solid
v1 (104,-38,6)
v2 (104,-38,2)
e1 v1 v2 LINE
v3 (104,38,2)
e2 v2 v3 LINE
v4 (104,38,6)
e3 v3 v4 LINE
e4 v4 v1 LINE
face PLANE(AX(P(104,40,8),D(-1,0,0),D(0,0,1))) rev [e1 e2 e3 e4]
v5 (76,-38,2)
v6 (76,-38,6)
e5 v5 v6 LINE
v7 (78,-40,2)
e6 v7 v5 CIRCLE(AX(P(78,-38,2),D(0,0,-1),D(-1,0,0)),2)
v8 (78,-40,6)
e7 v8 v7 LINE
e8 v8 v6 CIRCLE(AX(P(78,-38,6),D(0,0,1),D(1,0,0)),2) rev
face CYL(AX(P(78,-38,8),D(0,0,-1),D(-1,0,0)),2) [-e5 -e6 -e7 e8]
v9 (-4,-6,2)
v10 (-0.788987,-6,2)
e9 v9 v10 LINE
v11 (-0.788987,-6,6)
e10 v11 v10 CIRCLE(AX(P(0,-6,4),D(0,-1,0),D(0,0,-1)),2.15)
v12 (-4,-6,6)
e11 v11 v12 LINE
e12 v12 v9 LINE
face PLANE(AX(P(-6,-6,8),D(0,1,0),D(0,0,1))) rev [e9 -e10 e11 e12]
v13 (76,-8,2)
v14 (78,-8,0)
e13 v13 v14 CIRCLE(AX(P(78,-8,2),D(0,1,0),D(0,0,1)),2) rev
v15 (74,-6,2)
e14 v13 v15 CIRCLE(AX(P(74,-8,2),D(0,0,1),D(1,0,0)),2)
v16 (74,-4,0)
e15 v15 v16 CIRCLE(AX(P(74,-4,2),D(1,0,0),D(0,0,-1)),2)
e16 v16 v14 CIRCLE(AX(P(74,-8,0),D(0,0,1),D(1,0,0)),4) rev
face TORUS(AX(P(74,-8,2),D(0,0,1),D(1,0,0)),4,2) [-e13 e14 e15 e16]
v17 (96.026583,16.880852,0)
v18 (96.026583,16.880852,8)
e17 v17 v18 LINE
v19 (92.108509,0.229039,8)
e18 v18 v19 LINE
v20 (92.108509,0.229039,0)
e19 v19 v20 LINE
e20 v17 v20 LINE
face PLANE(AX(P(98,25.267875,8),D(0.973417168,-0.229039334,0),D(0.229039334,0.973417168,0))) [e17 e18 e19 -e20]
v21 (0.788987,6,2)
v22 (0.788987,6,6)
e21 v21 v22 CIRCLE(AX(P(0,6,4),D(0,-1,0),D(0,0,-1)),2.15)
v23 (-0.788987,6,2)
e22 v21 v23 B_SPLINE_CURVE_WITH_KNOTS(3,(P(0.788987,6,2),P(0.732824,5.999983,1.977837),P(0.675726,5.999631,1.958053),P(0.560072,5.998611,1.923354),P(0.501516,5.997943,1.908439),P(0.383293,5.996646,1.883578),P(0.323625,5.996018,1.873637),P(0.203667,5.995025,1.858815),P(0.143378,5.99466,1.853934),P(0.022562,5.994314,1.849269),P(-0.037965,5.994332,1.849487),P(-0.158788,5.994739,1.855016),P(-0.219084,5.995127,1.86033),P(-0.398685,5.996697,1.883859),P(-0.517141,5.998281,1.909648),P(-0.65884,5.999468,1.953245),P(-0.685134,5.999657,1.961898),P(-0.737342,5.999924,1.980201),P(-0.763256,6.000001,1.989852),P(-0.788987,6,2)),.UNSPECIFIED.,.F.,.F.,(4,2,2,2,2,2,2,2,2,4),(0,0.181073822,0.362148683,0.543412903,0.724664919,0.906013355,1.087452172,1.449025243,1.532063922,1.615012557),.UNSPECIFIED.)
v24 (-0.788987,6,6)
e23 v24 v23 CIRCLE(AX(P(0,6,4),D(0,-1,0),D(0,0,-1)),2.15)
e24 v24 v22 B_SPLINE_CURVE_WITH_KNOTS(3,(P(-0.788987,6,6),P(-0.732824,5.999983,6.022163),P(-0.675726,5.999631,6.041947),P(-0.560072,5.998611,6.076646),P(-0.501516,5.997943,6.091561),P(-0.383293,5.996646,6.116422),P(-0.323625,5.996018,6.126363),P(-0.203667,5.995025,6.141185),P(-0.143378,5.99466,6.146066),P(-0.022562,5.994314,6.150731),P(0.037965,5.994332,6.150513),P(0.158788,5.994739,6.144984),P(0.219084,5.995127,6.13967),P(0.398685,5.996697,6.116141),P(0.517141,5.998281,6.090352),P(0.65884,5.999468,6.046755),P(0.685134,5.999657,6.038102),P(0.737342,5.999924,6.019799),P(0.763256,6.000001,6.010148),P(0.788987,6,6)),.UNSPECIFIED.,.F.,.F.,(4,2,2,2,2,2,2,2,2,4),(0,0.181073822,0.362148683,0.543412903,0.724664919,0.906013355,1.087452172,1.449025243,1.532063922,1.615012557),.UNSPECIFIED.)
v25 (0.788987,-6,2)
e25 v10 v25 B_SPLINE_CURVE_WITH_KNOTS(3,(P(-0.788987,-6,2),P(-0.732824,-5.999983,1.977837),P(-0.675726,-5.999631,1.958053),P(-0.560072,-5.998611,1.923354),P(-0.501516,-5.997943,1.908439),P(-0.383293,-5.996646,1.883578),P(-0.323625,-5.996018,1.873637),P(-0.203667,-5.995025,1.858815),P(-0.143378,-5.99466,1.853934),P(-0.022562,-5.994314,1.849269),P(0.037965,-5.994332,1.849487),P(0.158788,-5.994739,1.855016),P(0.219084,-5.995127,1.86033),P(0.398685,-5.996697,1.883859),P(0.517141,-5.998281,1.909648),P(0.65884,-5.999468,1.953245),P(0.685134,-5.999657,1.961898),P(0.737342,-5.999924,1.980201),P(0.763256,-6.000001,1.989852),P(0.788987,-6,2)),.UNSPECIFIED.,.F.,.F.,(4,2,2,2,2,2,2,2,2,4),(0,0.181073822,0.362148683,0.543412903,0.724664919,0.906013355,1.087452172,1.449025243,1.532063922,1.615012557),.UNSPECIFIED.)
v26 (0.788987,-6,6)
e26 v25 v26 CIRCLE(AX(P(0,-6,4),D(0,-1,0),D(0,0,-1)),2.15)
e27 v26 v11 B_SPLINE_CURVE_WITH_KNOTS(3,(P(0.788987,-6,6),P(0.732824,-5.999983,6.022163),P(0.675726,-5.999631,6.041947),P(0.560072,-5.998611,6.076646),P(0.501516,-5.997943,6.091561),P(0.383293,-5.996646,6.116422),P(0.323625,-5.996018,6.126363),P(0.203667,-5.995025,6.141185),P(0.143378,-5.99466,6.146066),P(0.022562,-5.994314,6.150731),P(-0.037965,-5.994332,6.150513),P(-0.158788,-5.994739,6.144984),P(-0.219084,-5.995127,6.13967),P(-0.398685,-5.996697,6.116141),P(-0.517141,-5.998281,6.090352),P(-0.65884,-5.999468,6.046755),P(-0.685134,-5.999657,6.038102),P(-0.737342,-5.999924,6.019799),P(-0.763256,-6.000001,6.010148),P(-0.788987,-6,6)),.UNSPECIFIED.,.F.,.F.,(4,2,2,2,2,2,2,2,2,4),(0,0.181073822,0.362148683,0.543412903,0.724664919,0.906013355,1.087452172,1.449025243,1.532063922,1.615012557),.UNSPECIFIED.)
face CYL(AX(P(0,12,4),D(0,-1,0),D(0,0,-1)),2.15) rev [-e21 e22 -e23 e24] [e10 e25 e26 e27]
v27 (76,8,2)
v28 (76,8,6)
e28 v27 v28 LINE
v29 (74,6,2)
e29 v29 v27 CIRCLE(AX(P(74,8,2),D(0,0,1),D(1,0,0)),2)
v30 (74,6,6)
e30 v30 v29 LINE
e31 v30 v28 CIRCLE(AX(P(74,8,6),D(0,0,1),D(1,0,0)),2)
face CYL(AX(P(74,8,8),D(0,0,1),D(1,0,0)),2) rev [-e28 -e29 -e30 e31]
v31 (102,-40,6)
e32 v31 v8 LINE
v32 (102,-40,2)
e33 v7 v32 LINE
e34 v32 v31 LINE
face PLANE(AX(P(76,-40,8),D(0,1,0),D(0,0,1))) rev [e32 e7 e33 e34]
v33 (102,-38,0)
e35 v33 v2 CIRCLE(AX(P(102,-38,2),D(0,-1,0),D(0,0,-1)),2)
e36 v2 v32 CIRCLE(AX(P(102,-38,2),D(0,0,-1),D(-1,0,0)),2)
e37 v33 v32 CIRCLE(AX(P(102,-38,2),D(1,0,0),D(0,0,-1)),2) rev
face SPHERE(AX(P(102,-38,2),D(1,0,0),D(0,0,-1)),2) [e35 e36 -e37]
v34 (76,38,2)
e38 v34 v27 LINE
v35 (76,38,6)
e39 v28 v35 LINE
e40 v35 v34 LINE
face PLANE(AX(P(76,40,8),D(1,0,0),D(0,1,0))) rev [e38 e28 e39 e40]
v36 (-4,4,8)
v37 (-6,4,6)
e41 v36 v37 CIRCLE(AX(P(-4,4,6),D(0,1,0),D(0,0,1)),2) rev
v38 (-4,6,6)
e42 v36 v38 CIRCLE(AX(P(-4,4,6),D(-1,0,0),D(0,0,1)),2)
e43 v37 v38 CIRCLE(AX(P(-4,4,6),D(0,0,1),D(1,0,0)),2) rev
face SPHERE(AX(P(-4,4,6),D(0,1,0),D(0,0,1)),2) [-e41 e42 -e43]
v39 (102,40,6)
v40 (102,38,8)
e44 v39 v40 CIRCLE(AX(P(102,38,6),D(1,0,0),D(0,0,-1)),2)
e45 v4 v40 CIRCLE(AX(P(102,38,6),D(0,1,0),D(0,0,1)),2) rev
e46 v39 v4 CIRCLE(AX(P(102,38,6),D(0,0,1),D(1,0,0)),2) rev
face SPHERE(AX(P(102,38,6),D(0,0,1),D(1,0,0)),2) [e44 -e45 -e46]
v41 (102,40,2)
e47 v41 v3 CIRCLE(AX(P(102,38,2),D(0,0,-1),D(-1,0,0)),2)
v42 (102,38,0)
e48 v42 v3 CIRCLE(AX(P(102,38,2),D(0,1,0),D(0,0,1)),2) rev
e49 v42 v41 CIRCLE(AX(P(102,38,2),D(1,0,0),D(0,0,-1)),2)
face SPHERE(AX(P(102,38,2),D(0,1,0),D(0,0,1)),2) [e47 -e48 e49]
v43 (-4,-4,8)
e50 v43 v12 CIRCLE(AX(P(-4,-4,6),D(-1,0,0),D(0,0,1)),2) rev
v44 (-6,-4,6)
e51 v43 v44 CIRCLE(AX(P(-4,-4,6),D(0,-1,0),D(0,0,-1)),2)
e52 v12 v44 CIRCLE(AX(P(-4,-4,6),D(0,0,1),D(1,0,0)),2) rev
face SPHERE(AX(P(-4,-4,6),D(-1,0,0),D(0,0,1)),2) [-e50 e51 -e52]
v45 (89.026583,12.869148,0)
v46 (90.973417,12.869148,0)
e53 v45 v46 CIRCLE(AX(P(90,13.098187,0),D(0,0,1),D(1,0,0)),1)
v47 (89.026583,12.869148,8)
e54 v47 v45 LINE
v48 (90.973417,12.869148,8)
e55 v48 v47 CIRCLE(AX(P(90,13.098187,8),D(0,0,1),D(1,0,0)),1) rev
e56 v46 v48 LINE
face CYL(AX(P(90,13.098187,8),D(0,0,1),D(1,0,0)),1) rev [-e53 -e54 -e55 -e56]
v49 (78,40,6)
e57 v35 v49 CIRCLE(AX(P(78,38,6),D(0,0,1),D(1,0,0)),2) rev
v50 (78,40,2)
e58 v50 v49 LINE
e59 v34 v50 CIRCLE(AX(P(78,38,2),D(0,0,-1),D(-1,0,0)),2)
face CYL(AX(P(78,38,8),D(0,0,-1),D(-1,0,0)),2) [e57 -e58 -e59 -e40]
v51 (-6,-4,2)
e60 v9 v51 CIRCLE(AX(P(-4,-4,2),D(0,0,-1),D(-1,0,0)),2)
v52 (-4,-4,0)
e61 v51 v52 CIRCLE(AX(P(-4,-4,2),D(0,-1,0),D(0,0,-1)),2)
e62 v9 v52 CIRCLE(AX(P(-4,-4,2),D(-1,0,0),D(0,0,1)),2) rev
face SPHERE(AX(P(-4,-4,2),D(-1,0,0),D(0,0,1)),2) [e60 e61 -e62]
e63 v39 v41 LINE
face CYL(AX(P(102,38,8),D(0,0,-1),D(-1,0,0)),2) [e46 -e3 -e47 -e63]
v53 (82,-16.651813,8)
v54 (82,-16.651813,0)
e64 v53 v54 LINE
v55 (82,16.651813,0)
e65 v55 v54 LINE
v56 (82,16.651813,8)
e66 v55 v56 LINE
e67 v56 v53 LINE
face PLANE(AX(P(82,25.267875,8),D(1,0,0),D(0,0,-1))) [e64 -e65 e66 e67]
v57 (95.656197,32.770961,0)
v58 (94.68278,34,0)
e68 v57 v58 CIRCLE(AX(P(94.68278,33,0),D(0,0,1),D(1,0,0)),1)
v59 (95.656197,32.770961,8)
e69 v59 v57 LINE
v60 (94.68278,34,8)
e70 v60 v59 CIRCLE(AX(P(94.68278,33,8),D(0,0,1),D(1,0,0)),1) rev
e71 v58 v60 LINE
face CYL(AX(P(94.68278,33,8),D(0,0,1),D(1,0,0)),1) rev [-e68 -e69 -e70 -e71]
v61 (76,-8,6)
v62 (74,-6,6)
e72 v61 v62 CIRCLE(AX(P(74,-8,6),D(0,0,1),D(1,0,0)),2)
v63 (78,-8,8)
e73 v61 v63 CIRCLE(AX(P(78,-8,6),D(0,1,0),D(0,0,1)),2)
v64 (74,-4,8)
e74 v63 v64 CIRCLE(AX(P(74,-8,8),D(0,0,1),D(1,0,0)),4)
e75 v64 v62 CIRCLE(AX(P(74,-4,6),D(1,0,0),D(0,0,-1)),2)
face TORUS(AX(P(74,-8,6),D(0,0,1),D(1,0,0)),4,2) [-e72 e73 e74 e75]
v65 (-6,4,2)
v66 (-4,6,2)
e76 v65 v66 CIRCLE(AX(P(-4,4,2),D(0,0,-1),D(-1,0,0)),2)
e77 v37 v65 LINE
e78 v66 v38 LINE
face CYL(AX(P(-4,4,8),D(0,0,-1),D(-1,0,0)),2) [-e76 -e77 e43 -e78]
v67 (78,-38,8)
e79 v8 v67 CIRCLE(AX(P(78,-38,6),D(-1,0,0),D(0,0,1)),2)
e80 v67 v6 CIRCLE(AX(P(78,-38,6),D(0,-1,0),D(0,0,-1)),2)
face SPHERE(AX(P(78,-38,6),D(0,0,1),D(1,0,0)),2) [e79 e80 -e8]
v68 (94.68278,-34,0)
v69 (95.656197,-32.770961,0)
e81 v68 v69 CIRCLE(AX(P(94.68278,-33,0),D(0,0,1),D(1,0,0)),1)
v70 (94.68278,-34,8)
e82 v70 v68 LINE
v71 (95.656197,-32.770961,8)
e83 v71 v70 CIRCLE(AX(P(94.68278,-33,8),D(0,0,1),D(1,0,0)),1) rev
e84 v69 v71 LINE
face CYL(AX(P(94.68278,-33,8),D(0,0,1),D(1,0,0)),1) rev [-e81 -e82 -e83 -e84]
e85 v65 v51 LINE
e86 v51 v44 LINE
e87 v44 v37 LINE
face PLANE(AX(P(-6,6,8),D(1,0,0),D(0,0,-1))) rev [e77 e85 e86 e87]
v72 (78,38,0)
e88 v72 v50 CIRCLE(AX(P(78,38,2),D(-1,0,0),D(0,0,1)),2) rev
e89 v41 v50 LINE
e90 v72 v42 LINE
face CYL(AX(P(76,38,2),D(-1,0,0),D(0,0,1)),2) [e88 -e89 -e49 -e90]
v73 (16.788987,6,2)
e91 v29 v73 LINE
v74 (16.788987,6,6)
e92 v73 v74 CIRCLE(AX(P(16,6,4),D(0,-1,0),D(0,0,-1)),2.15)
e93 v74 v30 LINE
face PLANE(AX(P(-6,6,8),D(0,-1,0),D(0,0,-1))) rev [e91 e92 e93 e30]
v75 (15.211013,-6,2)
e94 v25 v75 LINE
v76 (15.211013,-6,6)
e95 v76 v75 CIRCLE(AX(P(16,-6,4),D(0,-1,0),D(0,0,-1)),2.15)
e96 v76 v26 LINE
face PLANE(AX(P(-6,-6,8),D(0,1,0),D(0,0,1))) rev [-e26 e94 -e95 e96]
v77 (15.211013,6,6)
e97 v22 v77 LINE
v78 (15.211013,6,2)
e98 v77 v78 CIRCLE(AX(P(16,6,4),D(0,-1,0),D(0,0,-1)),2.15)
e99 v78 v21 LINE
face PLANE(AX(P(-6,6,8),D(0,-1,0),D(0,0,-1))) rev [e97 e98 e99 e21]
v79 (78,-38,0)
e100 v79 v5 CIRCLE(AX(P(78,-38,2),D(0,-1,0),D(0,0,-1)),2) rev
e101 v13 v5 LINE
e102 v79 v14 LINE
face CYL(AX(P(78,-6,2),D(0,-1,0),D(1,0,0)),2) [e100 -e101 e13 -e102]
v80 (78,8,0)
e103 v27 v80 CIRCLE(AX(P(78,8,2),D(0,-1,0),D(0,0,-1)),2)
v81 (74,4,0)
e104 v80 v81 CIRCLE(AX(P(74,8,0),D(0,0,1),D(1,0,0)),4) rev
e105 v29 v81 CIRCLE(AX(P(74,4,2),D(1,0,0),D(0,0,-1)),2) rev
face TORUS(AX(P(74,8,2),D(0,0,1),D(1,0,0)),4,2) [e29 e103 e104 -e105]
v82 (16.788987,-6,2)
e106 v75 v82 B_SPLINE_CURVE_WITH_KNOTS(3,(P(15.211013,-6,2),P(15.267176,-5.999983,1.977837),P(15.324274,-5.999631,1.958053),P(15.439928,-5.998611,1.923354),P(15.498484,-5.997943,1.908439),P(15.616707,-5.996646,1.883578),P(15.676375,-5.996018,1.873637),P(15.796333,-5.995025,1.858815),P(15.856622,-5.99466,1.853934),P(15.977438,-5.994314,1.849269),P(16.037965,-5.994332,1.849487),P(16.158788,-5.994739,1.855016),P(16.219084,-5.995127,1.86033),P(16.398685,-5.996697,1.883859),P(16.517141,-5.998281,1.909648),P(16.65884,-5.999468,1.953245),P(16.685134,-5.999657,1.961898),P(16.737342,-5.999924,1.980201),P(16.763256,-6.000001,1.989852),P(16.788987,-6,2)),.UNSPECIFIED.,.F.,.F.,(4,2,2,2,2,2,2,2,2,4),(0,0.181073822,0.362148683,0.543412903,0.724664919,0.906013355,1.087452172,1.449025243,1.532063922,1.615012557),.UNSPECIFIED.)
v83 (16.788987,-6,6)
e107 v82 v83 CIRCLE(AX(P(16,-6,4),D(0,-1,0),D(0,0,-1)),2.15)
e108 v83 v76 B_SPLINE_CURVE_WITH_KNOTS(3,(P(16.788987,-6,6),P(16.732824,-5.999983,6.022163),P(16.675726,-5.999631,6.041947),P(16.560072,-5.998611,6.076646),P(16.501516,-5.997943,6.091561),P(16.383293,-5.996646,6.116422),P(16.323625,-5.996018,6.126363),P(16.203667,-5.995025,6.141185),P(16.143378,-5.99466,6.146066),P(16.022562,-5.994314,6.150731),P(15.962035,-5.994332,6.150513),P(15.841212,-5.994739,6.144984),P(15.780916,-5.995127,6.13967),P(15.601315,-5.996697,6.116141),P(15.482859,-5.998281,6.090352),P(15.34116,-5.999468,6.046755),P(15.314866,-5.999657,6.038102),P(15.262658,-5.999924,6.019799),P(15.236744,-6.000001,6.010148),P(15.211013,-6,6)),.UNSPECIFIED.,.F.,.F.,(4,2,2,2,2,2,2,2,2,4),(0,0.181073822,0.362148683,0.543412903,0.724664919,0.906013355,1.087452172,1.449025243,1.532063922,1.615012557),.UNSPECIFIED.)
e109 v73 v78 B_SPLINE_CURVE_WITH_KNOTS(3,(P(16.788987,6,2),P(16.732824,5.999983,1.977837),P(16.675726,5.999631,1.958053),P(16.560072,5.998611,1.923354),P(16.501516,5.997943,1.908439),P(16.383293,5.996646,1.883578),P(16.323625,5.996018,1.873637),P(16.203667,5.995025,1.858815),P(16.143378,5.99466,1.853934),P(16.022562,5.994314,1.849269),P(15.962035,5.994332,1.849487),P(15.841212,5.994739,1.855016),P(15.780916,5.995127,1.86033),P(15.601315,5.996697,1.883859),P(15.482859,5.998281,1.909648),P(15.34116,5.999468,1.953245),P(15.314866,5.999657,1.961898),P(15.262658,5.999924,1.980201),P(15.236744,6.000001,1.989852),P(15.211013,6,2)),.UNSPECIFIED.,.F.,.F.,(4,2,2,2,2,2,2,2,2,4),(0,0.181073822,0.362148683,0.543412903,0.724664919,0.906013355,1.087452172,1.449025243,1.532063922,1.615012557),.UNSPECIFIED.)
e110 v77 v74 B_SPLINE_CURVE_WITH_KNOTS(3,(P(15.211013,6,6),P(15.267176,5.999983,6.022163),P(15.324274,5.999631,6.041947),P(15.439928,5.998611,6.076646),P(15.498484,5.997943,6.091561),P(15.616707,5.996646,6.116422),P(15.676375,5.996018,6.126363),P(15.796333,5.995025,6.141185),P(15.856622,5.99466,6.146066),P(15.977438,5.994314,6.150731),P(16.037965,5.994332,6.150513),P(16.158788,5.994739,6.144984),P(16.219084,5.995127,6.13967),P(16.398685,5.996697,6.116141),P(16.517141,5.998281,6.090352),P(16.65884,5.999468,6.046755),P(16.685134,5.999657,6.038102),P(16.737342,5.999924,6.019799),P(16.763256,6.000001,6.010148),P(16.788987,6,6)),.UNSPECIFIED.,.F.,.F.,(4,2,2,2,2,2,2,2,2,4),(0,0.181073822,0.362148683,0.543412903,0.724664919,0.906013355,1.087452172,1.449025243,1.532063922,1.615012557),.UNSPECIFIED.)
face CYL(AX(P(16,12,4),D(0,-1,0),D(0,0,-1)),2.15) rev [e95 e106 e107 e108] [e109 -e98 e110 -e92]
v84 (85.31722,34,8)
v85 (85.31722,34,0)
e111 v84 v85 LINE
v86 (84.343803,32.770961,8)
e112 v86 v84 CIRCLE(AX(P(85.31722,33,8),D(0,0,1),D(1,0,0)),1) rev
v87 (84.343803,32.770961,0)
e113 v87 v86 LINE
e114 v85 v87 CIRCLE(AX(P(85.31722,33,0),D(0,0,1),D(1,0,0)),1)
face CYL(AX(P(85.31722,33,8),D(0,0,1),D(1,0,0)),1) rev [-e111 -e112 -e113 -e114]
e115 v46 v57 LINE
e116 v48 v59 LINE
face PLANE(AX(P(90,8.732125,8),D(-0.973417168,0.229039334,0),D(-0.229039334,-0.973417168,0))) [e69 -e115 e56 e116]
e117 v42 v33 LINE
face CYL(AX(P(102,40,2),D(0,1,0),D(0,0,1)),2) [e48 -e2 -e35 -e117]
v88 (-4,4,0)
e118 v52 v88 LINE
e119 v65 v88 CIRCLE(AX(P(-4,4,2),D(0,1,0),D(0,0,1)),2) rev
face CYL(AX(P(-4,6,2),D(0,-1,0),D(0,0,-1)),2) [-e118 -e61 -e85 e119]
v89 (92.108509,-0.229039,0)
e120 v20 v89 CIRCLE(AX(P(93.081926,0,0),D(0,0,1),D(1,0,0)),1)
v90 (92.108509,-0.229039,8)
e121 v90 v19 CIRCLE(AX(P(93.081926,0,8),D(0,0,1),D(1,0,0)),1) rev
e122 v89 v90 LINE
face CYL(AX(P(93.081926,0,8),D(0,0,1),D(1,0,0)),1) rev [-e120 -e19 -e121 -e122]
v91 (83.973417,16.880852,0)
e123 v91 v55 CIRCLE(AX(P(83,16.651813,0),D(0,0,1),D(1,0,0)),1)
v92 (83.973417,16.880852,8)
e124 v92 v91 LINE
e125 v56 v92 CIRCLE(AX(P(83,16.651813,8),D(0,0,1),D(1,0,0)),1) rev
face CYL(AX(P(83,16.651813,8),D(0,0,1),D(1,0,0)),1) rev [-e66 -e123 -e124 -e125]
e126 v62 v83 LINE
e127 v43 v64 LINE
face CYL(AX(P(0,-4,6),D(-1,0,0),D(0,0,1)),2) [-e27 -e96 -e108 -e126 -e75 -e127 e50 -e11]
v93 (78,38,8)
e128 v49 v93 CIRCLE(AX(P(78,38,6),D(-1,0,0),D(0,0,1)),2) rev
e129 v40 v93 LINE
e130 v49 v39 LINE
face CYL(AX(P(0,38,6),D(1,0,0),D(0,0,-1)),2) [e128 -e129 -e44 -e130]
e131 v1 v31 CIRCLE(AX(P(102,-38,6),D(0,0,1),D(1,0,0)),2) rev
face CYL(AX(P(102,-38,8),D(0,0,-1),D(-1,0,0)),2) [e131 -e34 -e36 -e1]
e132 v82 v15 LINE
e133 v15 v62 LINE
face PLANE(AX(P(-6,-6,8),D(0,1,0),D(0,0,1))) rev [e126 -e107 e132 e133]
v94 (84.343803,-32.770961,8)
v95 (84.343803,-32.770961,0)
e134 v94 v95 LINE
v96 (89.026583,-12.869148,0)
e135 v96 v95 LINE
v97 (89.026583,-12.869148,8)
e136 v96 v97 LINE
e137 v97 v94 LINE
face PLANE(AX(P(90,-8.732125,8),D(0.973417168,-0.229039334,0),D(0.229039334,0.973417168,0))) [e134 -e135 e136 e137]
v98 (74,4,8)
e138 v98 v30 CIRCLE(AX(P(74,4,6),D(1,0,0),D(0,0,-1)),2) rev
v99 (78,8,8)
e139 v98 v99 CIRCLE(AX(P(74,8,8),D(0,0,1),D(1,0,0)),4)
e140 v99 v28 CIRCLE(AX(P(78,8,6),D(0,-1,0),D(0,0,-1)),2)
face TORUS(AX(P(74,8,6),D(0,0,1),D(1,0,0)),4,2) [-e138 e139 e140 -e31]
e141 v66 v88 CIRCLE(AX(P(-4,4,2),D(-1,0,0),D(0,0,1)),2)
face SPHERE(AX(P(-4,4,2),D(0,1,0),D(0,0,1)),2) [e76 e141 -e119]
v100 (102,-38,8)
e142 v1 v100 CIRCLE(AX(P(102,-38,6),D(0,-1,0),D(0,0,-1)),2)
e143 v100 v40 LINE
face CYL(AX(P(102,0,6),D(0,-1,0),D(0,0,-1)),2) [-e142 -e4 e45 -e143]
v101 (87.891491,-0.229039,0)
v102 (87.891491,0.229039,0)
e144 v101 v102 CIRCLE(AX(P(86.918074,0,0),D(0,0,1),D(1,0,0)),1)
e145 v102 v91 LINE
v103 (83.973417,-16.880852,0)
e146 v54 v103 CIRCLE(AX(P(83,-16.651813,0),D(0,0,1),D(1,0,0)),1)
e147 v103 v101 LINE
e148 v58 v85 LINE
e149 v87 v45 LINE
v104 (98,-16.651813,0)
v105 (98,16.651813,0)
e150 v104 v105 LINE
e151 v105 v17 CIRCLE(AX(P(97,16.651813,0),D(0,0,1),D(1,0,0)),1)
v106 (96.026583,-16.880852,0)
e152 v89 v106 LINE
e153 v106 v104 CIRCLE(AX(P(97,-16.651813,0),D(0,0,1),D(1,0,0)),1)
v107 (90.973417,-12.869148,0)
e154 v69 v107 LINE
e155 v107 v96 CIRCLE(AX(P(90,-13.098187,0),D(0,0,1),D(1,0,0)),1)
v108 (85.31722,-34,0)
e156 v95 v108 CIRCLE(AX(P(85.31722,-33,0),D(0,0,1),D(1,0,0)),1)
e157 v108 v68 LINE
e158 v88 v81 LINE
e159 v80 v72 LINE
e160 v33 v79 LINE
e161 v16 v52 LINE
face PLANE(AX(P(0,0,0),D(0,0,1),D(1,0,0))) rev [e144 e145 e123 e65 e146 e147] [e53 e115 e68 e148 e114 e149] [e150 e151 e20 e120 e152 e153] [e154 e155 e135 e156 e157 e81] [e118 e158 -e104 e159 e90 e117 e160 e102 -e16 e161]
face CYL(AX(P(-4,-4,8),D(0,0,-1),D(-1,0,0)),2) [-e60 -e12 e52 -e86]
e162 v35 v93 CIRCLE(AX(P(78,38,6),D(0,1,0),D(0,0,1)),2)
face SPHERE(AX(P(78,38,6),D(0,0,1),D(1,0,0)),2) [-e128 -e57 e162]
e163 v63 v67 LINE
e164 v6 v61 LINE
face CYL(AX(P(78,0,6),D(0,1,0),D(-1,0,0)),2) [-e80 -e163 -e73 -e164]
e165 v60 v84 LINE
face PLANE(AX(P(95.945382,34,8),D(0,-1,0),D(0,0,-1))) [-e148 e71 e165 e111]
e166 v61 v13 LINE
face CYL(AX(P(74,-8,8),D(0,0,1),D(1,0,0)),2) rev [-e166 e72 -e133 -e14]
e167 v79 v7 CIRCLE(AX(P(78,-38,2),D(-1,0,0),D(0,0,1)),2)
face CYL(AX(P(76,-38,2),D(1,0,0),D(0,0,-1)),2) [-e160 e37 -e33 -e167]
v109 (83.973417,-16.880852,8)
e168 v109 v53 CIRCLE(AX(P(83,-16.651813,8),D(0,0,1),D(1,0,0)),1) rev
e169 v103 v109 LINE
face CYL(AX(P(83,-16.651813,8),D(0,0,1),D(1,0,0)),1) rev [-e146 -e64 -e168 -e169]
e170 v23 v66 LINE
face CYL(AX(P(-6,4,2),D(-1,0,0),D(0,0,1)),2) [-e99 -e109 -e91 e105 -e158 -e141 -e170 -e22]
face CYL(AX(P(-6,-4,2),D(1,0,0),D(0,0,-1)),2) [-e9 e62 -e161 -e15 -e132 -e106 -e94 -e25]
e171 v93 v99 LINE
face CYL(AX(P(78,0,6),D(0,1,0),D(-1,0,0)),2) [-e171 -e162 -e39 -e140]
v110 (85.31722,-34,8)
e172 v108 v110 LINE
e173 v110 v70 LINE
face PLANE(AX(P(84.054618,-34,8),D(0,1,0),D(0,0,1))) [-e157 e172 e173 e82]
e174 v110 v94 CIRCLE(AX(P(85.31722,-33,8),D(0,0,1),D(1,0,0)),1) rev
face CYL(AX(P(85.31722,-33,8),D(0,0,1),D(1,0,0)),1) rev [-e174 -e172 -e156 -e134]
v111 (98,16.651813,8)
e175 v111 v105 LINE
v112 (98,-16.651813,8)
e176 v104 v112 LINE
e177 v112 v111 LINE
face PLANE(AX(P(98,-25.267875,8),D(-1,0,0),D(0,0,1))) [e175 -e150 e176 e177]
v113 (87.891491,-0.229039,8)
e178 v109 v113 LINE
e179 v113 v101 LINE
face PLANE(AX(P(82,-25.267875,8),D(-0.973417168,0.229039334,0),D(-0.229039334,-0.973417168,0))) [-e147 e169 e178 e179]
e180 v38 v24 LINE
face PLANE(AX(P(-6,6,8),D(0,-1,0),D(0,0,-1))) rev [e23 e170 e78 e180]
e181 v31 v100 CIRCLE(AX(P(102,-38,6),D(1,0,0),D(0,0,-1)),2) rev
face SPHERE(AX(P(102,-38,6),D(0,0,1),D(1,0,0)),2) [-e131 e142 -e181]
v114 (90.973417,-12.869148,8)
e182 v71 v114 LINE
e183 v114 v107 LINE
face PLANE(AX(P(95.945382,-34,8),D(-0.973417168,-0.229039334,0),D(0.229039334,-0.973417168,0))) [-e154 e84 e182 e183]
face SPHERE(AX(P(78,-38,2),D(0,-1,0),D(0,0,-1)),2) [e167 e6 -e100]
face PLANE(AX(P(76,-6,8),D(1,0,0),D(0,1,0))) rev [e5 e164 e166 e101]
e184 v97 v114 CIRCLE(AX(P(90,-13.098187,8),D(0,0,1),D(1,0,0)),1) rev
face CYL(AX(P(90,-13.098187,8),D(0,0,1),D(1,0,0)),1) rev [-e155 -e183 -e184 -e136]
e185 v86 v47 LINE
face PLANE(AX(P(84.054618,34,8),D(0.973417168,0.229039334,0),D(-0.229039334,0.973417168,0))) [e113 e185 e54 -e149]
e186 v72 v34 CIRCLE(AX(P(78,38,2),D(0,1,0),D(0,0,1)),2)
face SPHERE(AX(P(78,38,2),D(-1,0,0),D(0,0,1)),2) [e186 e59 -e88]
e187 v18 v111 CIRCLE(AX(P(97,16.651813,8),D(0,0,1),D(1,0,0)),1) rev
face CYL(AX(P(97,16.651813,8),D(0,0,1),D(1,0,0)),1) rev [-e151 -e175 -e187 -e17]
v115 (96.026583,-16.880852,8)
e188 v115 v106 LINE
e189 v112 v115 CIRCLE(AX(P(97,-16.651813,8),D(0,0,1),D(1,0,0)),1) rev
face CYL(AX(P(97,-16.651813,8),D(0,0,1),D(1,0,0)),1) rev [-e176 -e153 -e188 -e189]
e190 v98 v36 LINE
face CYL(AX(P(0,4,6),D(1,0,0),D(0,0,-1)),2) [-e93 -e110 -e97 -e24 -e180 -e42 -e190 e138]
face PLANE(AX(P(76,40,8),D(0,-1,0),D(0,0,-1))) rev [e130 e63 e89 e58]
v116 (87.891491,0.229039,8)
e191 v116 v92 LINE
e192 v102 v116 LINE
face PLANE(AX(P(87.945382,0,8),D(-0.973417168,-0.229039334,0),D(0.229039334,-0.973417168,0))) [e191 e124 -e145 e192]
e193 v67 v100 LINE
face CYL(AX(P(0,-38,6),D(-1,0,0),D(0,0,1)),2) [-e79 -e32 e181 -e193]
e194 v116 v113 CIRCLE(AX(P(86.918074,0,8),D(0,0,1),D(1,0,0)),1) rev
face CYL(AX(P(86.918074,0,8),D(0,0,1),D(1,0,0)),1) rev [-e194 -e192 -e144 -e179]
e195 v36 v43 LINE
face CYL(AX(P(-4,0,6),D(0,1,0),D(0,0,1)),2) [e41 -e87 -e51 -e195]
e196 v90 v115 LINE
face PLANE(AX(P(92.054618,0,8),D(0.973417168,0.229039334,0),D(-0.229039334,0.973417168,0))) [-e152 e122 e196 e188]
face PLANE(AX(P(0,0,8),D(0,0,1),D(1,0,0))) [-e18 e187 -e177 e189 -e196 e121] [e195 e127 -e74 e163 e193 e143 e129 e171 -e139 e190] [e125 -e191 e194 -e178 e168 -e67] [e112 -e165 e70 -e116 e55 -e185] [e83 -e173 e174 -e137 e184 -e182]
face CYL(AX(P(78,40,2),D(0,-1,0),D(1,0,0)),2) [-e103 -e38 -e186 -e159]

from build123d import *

# Parameters (mm, degrees)
BOSS_EXTRUDE1_DEPTH = 8
SKETCH2_R           = 2.15
CUT_EXTRUDE1_DEPTH  = 18
FILLET1_R           = 2
FILLET2_R           = 1


with BuildPart() as part:
    # Sketch1 → Boss-Extrude1 (new body)
    with BuildSketch(Plane.XY):
        Polygon((76, -6), (76, -40), (104, -40), (104, 40), (76, 40), (76, 6), (-6, 6), (-6, -6), align=None)
        Polygon((84.054617553, 34), (90, 8.732124598), (95.945382447, 34), align=None, mode=Mode.SUBTRACT)
        Polygon((82, 25.267875402), (82, -25.267875402), (87.945382447, 0), align=None, mode=Mode.SUBTRACT)
        Polygon((98, 25.267875402), (92.054617553, 0), (98, -25.267875402), align=None, mode=Mode.SUBTRACT)
        Polygon((84.054617553, -34), (95.945382447, -34), (90, -8.732124598), align=None, mode=Mode.SUBTRACT)
    extrude(amount=BOSS_EXTRUDE1_DEPTH)

    # Sketch2 → Cut-Extrude1 (cut)
    with BuildSketch(Plane.XZ.offset(6)):
        with Locations(Location((0, 4, 0), (0, 0, 270))):
            Circle(SKETCH2_R)
        with Locations(Location((16, 4, 0), (0, 0, 270))):
            Circle(SKETCH2_R)
    extrude(amount=-CUT_EXTRUDE1_DEPTH, mode=Mode.SUBTRACT)

    # Fillet1
    # the kernel refuses this fillet: 2 mm, written as the material it adds along each edge
    with BuildSketch(Plane(origin=(76, 6, 0), x_dir=(0, 1, 0), z_dir=(0, 0, 1))) as fillet1_piece_1:
        with BuildLine():
            CenterArc((FILLET1_R, FILLET1_R), FILLET1_R, 180, 90)
            Line((0, FILLET1_R), (0, 0))
            Line((0, 0), (FILLET1_R, 0))
        make_face()
    extrude(amount=8)
    with BuildSketch(Plane(origin=(76, -6, 0), x_dir=(0, -1, 0), z_dir=(0, 0, 1))) as fillet1_piece_2:
        with BuildLine():
            CenterArc((FILLET1_R, -FILLET1_R), FILLET1_R, 90, 90)
            Line((0, -FILLET1_R), (0, 0))
            Line((0, 0), (FILLET1_R, 0))
        make_face()
    extrude(amount=8)
    # the kernel refuses this fillet: 2 mm, written as the material it takes off along each edge
    with BuildSketch(Plane(origin=(102, -38, 2), x_dir=(0, -1, 0), z_dir=(0, 0, -1))) as fillet1_2_piece_1_section:
        Polygon((0, 0), (FILLET1_R, 0), (FILLET1_R, -FILLET1_R), (0, -FILLET1_R), align=None)
    fillet1_2_piece_1 = extrude(amount=FILLET1_R, mode=Mode.PRIVATE)
    fillet1_2_piece_1 = fillet1_2_piece_1 - Plane(origin=(102, -38, 2), x_dir=(-0.7071067811865475, 0.7071067811865475, 0), z_dir=(0, 0, -1)) * Sphere(FILLET1_R, mode=Mode.PRIVATE)
    add(fillet1_2_piece_1, mode=Mode.SUBTRACT)
    with BuildSketch(Plane(origin=(102, 38, 2), x_dir=(1, 0, 0), z_dir=(0, 0, -1))) as fillet1_2_piece_2_section:
        Polygon((0, 0), (FILLET1_R, 0), (FILLET1_R, -FILLET1_R), (0, -FILLET1_R), align=None)
    fillet1_2_piece_2 = extrude(amount=FILLET1_R, mode=Mode.PRIVATE)
    fillet1_2_piece_2 = fillet1_2_piece_2 - Plane(origin=(102, 38, 2), x_dir=(-0.7071067811865475, -0.7071067811865475, 0), z_dir=(0, 0, -1)) * Sphere(FILLET1_R, mode=Mode.PRIVATE)
    add(fillet1_2_piece_2, mode=Mode.SUBTRACT)
    with BuildSketch(Plane(origin=(102, 38, 6), x_dir=(1, 0, 0), z_dir=(0, 0, 1))) as fillet1_2_piece_3_section:
        Polygon((0, 0), (FILLET1_R, 0), (FILLET1_R, FILLET1_R), (0, FILLET1_R), align=None)
    fillet1_2_piece_3 = extrude(amount=FILLET1_R, mode=Mode.PRIVATE)
    fillet1_2_piece_3 = fillet1_2_piece_3 - Plane(origin=(102, 38, 6), x_dir=(-0.7071067811865475, -0.7071067811865475, 0), z_dir=(0, 0, 1)) * Sphere(FILLET1_R, mode=Mode.PRIVATE)
    add(fillet1_2_piece_3, mode=Mode.SUBTRACT)
    with BuildSketch(Plane(origin=(102, -38, 6), x_dir=(0, 0, 1), z_dir=(0, -1, 0))) as fillet1_2_piece_4_section:
        Polygon((0, 0), (FILLET1_R, 0), (FILLET1_R, -FILLET1_R), (0, -FILLET1_R), align=None)
    fillet1_2_piece_4 = extrude(amount=FILLET1_R, mode=Mode.PRIVATE)
    fillet1_2_piece_4 = fillet1_2_piece_4 - Plane(origin=(102, -38, 6), x_dir=(-0.7071067811865475, 0, -0.7071067811865475), z_dir=(0, -1, 0)) * Sphere(FILLET1_R, mode=Mode.PRIVATE)
    add(fillet1_2_piece_4, mode=Mode.SUBTRACT)
    with BuildSketch(Plane(origin=(71, -40, 0), x_dir=(0, 1, 0), z_dir=(1, 0, 0)), Plane(origin=(71, -40, 8), x_dir=(0, 0, -1), z_dir=(1, 0, 0)), Plane(origin=(102, 40, 0), x_dir=(0, -1, 0), z_dir=(-1, 0, 0))) as fillet1_2_piece_5:
        with BuildLine():
            CenterArc((FILLET1_R, FILLET1_R), FILLET1_R, 180, 90)
            Line((0, FILLET1_R), (0, 0))
            Line((0, 0), (FILLET1_R, 0))
        make_face()
    extrude(amount=31, mode=Mode.SUBTRACT)
    with BuildSketch(Plane(origin=(-6, 11, 0), x_dir=(1, 0, 0), z_dir=(0, -1, 0))) as fillet1_2_piece_6:
        with BuildLine():
            CenterArc((FILLET1_R, FILLET1_R), FILLET1_R, 180, 90)
            Line((0, FILLET1_R), (0, 0))
            Line((0, 0), (FILLET1_R, 0))
        make_face()
    extrude(amount=22, mode=Mode.SUBTRACT)
    with BuildSketch(Plane(origin=(-6, 6, -5), x_dir=(1, 0, 0), z_dir=(0, 0, 1)), Plane(origin=(76, 40, -5), x_dir=(1, 0, 0), z_dir=(0, 0, 1)), Plane(origin=(76, -40, -5), x_dir=(0, 1, 0), z_dir=(0, 0, 1)), Plane(origin=(-6, -6, -5), x_dir=(0, 1, 0), z_dir=(0, 0, 1))) as fillet1_2_piece_7:
        with BuildLine():
            CenterArc((FILLET1_R, -FILLET1_R), FILLET1_R, 90, 90)
            Line((0, -FILLET1_R), (0, 0))
            Line((0, 0), (FILLET1_R, 0))
        make_face()
    extrude(amount=18, mode=Mode.SUBTRACT)
    with BuildSketch(Plane(origin=(104, 40, 2), x_dir=(0, -1, 0), z_dir=(0, 0, 1)), Plane(origin=(104, -40, 2), x_dir=(-1, 0, 0), z_dir=(0, 0, 1))) as fillet1_2_piece_8:
        with BuildLine():
            CenterArc((FILLET1_R, -FILLET1_R), FILLET1_R, 90, 90)
            Line((0, -FILLET1_R), (0, 0))
            Line((0, 0), (FILLET1_R, 0))
        make_face()
    extrude(amount=4, mode=Mode.SUBTRACT)
    with BuildSketch(Plane(origin=(104, -38, 8), x_dir=(-1, 0, 0), z_dir=(0, 1, 0))) as fillet1_2_piece_9:
        with BuildLine():
            CenterArc((FILLET1_R, -FILLET1_R), FILLET1_R, 90, 90)
            Line((0, -FILLET1_R), (0, 0))
            Line((0, 0), (FILLET1_R, 0))
        make_face()
    extrude(amount=76, mode=Mode.SUBTRACT)
    with BuildSketch(Plane(origin=(102, 40, 8), x_dir=(0, -1, 0), z_dir=(-1, 0, 0))) as fillet1_2_piece_10:
        with BuildLine():
            CenterArc((FILLET1_R, -FILLET1_R), FILLET1_R, 90, 90)
            Line((0, -FILLET1_R), (0, 0))
            Line((0, 0), (FILLET1_R, 0))
        make_face()
    extrude(amount=31, mode=Mode.SUBTRACT)
    with BuildSketch(Plane(origin=(-6, 11, 8), x_dir=(1, 0, 0), z_dir=(0, -1, 0))) as fillet1_2_piece_11:
        with BuildLine():
            CenterArc((FILLET1_R, -FILLET1_R), FILLET1_R, 90, 90)
            Line((0, -FILLET1_R), (0, 0))
            Line((0, 0), (FILLET1_R, 0))
        make_face()
    extrude(amount=22, mode=Mode.SUBTRACT)
    with BuildSketch(Plane(origin=(104, -38, 0), x_dir=(-1, 0, 0), z_dir=(0, 1, 0))) as fillet1_2_piece_12:
        with BuildLine():
            CenterArc((FILLET1_R, FILLET1_R), FILLET1_R, 180, 90)
            Line((0, FILLET1_R), (0, 0))
            Line((0, 0), (FILLET1_R, 0))
        make_face()
    extrude(amount=76, mode=Mode.SUBTRACT)
    # the kernel refuses this fillet: 2 mm, written as the material it takes off along each edge
    with BuildSketch(Plane(origin=(78, 38, 2), x_dir=(-1, 0, 0), z_dir=(0, 0, -1))) as fillet1_3_piece_1_section:
        Polygon((0, 0), (FILLET1_R, 0), (FILLET1_R, FILLET1_R), (0, FILLET1_R), align=None)
    fillet1_3_piece_1 = extrude(amount=FILLET1_R, mode=Mode.PRIVATE)
    fillet1_3_piece_1 = fillet1_3_piece_1 - Plane(origin=(78, 38, 2), x_dir=(0.7071067811865474, -0.7071067811865477, 0), z_dir=(0, 0, -1)) * Sphere(FILLET1_R, mode=Mode.PRIVATE)
    add(fillet1_3_piece_1, mode=Mode.SUBTRACT)
    with BuildSketch(Plane(origin=(-4, -4, 6), x_dir=(0, -1, 0), z_dir=(0, 0, 1))) as fillet1_3_piece_2_section:
        Polygon((0, 0), (FILLET1_R, 0), (FILLET1_R, -FILLET1_R), (0, -FILLET1_R), align=None)
    fillet1_3_piece_2 = extrude(amount=FILLET1_R, mode=Mode.PRIVATE)
    fillet1_3_piece_2 = fillet1_3_piece_2 - Plane(origin=(-4, -4, 6), x_dir=(0.7071067811865475, 0.7071067811865475, 0), z_dir=(0, 0, 1)) * Sphere(FILLET1_R, mode=Mode.PRIVATE)
    add(fillet1_3_piece_2, mode=Mode.SUBTRACT)
    with BuildSketch(Plane(origin=(-4, 4, 2), x_dir=(0, 1, 0), z_dir=(0, 0, -1))) as fillet1_3_piece_3_section:
        Polygon((0, 0), (FILLET1_R, 0), (FILLET1_R, -FILLET1_R), (0, -FILLET1_R), align=None)
    fillet1_3_piece_3 = extrude(amount=FILLET1_R, mode=Mode.PRIVATE)
    fillet1_3_piece_3 = fillet1_3_piece_3 - Plane(origin=(-4, 4, 2), x_dir=(0.7071067811865475, -0.7071067811865475, 0), z_dir=(0, 0, -1)) * Sphere(FILLET1_R, mode=Mode.PRIVATE)
    add(fillet1_3_piece_3, mode=Mode.SUBTRACT)
    with BuildSketch(Plane(origin=(-4, 4, 6), x_dir=(0, 1, 0), z_dir=(0, 0, 1))) as fillet1_3_piece_4_section:
        Polygon((0, 0), (FILLET1_R, 0), (FILLET1_R, FILLET1_R), (0, FILLET1_R), align=None)
    fillet1_3_piece_4 = extrude(amount=FILLET1_R, mode=Mode.PRIVATE)
    fillet1_3_piece_4 = fillet1_3_piece_4 - Plane(origin=(-4, 4, 6), x_dir=(0.7071067811865475, -0.7071067811865475, 0), z_dir=(0, 0, 1)) * Sphere(FILLET1_R, mode=Mode.PRIVATE)
    add(fillet1_3_piece_4, mode=Mode.SUBTRACT)
    with BuildSketch(Plane(origin=(78, 38, 6), x_dir=(-1, 0, 0), z_dir=(0, 0, 1))) as fillet1_3_piece_5_section:
        Polygon((0, 0), (FILLET1_R, 0), (FILLET1_R, -FILLET1_R), (0, -FILLET1_R), align=None)
    fillet1_3_piece_5 = extrude(amount=FILLET1_R, mode=Mode.PRIVATE)
    fillet1_3_piece_5 = fillet1_3_piece_5 - Plane(origin=(78, 38, 6), x_dir=(0.7071067811865474, -0.7071067811865477, 0), z_dir=(0, 0, 1)) * Sphere(FILLET1_R, mode=Mode.PRIVATE)
    add(fillet1_3_piece_5, mode=Mode.SUBTRACT)
    with BuildSketch(Plane(origin=(78, -38, 6), x_dir=(0, 0, 1), z_dir=(-1, 0, 0))) as fillet1_3_piece_6_section:
        Polygon((0, 0), (FILLET1_R, 0), (FILLET1_R, -FILLET1_R), (0, -FILLET1_R), align=None)
    fillet1_3_piece_6 = extrude(amount=FILLET1_R, mode=Mode.PRIVATE)
    fillet1_3_piece_6 = fillet1_3_piece_6 - Plane(origin=(78, -38, 6), x_dir=(0, 0.7071067811865475, -0.7071067811865475), z_dir=(-1, 0, 0)) * Sphere(FILLET1_R, mode=Mode.PRIVATE)
    add(fillet1_3_piece_6, mode=Mode.SUBTRACT)
    with BuildSketch(Plane(origin=(-4, -4, 2), x_dir=(0, -1, 0), z_dir=(0, 0, -1))) as fillet1_3_piece_7_section:
        Polygon((0, 0), (FILLET1_R, 0), (FILLET1_R, FILLET1_R), (0, FILLET1_R), align=None)
    fillet1_3_piece_7 = extrude(amount=FILLET1_R, mode=Mode.PRIVATE)
    fillet1_3_piece_7 = fillet1_3_piece_7 - Plane(origin=(-4, -4, 2), x_dir=(0.7071067811865475, 0.7071067811865475, 0), z_dir=(0, 0, -1)) * Sphere(FILLET1_R, mode=Mode.PRIVATE)
    add(fillet1_3_piece_7, mode=Mode.SUBTRACT)
    with BuildSketch(Plane(origin=(78, -38, 2), x_dir=(0, 0, -1), z_dir=(-1, 0, 0))) as fillet1_3_piece_8_section:
        Polygon((0, 0), (FILLET1_R, 0), (FILLET1_R, FILLET1_R), (0, FILLET1_R), align=None)
    fillet1_3_piece_8 = extrude(amount=FILLET1_R, mode=Mode.PRIVATE)
    fillet1_3_piece_8 = fillet1_3_piece_8 - Plane(origin=(78, -38, 2), x_dir=(0, 0.7071067811865475, 0.7071067811865475), z_dir=(-1, 0, 0)) * Sphere(FILLET1_R, mode=Mode.PRIVATE)
    add(fillet1_3_piece_8, mode=Mode.SUBTRACT)
    with BuildSketch(Plane(origin=(76, -8, 0), x_dir=(0, 0, 1), z_dir=(0, -1, 0)), Plane(origin=(76, 38, 8), x_dir=(1, 0, 0), z_dir=(0, -1, 0))) as fillet1_3_piece_9:
        with BuildLine():
            CenterArc((FILLET1_R, -FILLET1_R), FILLET1_R, 90, 90)
            Line((0, -FILLET1_R), (0, 0))
            Line((0, 0), (FILLET1_R, 0))
        make_face()
    extrude(amount=30, mode=Mode.SUBTRACT)
    with BuildSketch(Plane(origin=(-4, -6, 0), x_dir=(0, 1, 0), z_dir=(1, 0, 0)), Plane(origin=(74, 6, 0), x_dir=(0, -1, 0), z_dir=(-1, 0, 0))) as fillet1_3_piece_10:
        with BuildLine():
            CenterArc((FILLET1_R, FILLET1_R), FILLET1_R, 180, 90)
            Line((0, FILLET1_R), (0, 0))
            Line((0, 0), (FILLET1_R, 0))
        make_face()
    extrude(amount=78, mode=Mode.SUBTRACT)
    with BuildSketch(Plane(origin=(76, -8, 8), x_dir=(0, 0, -1), z_dir=(0, -1, 0)), Plane(origin=(76, 38, 0), x_dir=(1, 0, 0), z_dir=(0, -1, 0))) as fillet1_3_piece_11:
        with BuildLine():
            CenterArc((FILLET1_R, FILLET1_R), FILLET1_R, 180, 90)
            Line((0, FILLET1_R), (0, 0))
            Line((0, 0), (FILLET1_R, 0))
        make_face()
    extrude(amount=30, mode=Mode.SUBTRACT)
    with BuildSketch(Plane(origin=(74, 6, 8), x_dir=(0, -1, 0), z_dir=(-1, 0, 0)), Plane(origin=(-4, -6, 8), x_dir=(0, 1, 0), z_dir=(1, 0, 0))) as fillet1_3_piece_12:
        with BuildLine():
            CenterArc((FILLET1_R, -FILLET1_R), FILLET1_R, 90, 90)
            Line((0, -FILLET1_R), (0, 0))
            Line((0, 0), (FILLET1_R, 0))
        make_face()
    extrude(amount=78, mode=Mode.SUBTRACT)
    with BuildSketch(Plane(origin=(74, 8, 0), x_dir=(1, 0, 0), z_dir=(0, 1, 0))) as fillet1_3_piece_13:
        with BuildLine():
            CenterArc((2 + FILLET1_R, -FILLET1_R), FILLET1_R, 90, 90)
            Line((2, -FILLET1_R), (2, 0))
            Line((2, 0), (2 + FILLET1_R, 0))
        make_face()
    revolve(axis=Axis((74, 8, 0), (0, 0, -1)), revolution_arc=90, mode=Mode.SUBTRACT)
    with BuildSketch(Plane(origin=(74, -8, 8), x_dir=(1, 0, 0), z_dir=(0, -1, 0))) as fillet1_3_piece_14:
        with BuildLine():
            CenterArc((2 + FILLET1_R, -FILLET1_R), FILLET1_R, 90, 90)
            Line((2, -FILLET1_R), (2, 0))
            Line((2, 0), (2 + FILLET1_R, 0))
        make_face()
    revolve(axis=Axis((74, -8, 8), (0, 0, 1)), revolution_arc=90, mode=Mode.SUBTRACT)
    with BuildSketch(Plane(origin=(74, 8, 8), x_dir=(1, 0, 0), z_dir=(0, 1, 0))) as fillet1_3_piece_15:
        with BuildLine():
            CenterArc((2 + FILLET1_R, FILLET1_R), FILLET1_R, 180, 90)
            Line((2, FILLET1_R), (2, 0))
            Line((2, 0), (2 + FILLET1_R, 0))
        make_face()
    revolve(axis=Axis((74, 8, 8), (0, 0, -1)), revolution_arc=90, mode=Mode.SUBTRACT)
    with BuildSketch(Plane(origin=(74, -8, 0), x_dir=(1, 0, 0), z_dir=(0, -1, 0))) as fillet1_3_piece_16:
        with BuildLine():
            CenterArc((2 + FILLET1_R, FILLET1_R), FILLET1_R, 180, 90)
            Line((2, FILLET1_R), (2, 0))
            Line((2, 0), (2 + FILLET1_R, 0))
        make_face()
    revolve(axis=Axis((74, -8, 0), (0, 0, 1)), revolution_arc=90, mode=Mode.SUBTRACT)

    # Fillet2
    fillet2_edges = [part.edges().sort_by_distance(p)[0] for p in [
        (95.945382447, 34, 4),
        (84.054617553, 34, 4),
        (90, 8.732124598, 4),
        (87.945382447, 0, 4),
        (82, 25.267875402, 4),
        (82, -25.267875402, 4),
        (90, -8.732124598, 4),
        (84.054617553, -34, 4),
        (95.945382447, -34, 4),
        (98, -25.267875402, 4),
        (98, 25.267875402, 4),
        (92.054617553, 0, 4),
    ]]
    fillet(fillet2_edges, radius=FILLET2_R)


solid = part.part
